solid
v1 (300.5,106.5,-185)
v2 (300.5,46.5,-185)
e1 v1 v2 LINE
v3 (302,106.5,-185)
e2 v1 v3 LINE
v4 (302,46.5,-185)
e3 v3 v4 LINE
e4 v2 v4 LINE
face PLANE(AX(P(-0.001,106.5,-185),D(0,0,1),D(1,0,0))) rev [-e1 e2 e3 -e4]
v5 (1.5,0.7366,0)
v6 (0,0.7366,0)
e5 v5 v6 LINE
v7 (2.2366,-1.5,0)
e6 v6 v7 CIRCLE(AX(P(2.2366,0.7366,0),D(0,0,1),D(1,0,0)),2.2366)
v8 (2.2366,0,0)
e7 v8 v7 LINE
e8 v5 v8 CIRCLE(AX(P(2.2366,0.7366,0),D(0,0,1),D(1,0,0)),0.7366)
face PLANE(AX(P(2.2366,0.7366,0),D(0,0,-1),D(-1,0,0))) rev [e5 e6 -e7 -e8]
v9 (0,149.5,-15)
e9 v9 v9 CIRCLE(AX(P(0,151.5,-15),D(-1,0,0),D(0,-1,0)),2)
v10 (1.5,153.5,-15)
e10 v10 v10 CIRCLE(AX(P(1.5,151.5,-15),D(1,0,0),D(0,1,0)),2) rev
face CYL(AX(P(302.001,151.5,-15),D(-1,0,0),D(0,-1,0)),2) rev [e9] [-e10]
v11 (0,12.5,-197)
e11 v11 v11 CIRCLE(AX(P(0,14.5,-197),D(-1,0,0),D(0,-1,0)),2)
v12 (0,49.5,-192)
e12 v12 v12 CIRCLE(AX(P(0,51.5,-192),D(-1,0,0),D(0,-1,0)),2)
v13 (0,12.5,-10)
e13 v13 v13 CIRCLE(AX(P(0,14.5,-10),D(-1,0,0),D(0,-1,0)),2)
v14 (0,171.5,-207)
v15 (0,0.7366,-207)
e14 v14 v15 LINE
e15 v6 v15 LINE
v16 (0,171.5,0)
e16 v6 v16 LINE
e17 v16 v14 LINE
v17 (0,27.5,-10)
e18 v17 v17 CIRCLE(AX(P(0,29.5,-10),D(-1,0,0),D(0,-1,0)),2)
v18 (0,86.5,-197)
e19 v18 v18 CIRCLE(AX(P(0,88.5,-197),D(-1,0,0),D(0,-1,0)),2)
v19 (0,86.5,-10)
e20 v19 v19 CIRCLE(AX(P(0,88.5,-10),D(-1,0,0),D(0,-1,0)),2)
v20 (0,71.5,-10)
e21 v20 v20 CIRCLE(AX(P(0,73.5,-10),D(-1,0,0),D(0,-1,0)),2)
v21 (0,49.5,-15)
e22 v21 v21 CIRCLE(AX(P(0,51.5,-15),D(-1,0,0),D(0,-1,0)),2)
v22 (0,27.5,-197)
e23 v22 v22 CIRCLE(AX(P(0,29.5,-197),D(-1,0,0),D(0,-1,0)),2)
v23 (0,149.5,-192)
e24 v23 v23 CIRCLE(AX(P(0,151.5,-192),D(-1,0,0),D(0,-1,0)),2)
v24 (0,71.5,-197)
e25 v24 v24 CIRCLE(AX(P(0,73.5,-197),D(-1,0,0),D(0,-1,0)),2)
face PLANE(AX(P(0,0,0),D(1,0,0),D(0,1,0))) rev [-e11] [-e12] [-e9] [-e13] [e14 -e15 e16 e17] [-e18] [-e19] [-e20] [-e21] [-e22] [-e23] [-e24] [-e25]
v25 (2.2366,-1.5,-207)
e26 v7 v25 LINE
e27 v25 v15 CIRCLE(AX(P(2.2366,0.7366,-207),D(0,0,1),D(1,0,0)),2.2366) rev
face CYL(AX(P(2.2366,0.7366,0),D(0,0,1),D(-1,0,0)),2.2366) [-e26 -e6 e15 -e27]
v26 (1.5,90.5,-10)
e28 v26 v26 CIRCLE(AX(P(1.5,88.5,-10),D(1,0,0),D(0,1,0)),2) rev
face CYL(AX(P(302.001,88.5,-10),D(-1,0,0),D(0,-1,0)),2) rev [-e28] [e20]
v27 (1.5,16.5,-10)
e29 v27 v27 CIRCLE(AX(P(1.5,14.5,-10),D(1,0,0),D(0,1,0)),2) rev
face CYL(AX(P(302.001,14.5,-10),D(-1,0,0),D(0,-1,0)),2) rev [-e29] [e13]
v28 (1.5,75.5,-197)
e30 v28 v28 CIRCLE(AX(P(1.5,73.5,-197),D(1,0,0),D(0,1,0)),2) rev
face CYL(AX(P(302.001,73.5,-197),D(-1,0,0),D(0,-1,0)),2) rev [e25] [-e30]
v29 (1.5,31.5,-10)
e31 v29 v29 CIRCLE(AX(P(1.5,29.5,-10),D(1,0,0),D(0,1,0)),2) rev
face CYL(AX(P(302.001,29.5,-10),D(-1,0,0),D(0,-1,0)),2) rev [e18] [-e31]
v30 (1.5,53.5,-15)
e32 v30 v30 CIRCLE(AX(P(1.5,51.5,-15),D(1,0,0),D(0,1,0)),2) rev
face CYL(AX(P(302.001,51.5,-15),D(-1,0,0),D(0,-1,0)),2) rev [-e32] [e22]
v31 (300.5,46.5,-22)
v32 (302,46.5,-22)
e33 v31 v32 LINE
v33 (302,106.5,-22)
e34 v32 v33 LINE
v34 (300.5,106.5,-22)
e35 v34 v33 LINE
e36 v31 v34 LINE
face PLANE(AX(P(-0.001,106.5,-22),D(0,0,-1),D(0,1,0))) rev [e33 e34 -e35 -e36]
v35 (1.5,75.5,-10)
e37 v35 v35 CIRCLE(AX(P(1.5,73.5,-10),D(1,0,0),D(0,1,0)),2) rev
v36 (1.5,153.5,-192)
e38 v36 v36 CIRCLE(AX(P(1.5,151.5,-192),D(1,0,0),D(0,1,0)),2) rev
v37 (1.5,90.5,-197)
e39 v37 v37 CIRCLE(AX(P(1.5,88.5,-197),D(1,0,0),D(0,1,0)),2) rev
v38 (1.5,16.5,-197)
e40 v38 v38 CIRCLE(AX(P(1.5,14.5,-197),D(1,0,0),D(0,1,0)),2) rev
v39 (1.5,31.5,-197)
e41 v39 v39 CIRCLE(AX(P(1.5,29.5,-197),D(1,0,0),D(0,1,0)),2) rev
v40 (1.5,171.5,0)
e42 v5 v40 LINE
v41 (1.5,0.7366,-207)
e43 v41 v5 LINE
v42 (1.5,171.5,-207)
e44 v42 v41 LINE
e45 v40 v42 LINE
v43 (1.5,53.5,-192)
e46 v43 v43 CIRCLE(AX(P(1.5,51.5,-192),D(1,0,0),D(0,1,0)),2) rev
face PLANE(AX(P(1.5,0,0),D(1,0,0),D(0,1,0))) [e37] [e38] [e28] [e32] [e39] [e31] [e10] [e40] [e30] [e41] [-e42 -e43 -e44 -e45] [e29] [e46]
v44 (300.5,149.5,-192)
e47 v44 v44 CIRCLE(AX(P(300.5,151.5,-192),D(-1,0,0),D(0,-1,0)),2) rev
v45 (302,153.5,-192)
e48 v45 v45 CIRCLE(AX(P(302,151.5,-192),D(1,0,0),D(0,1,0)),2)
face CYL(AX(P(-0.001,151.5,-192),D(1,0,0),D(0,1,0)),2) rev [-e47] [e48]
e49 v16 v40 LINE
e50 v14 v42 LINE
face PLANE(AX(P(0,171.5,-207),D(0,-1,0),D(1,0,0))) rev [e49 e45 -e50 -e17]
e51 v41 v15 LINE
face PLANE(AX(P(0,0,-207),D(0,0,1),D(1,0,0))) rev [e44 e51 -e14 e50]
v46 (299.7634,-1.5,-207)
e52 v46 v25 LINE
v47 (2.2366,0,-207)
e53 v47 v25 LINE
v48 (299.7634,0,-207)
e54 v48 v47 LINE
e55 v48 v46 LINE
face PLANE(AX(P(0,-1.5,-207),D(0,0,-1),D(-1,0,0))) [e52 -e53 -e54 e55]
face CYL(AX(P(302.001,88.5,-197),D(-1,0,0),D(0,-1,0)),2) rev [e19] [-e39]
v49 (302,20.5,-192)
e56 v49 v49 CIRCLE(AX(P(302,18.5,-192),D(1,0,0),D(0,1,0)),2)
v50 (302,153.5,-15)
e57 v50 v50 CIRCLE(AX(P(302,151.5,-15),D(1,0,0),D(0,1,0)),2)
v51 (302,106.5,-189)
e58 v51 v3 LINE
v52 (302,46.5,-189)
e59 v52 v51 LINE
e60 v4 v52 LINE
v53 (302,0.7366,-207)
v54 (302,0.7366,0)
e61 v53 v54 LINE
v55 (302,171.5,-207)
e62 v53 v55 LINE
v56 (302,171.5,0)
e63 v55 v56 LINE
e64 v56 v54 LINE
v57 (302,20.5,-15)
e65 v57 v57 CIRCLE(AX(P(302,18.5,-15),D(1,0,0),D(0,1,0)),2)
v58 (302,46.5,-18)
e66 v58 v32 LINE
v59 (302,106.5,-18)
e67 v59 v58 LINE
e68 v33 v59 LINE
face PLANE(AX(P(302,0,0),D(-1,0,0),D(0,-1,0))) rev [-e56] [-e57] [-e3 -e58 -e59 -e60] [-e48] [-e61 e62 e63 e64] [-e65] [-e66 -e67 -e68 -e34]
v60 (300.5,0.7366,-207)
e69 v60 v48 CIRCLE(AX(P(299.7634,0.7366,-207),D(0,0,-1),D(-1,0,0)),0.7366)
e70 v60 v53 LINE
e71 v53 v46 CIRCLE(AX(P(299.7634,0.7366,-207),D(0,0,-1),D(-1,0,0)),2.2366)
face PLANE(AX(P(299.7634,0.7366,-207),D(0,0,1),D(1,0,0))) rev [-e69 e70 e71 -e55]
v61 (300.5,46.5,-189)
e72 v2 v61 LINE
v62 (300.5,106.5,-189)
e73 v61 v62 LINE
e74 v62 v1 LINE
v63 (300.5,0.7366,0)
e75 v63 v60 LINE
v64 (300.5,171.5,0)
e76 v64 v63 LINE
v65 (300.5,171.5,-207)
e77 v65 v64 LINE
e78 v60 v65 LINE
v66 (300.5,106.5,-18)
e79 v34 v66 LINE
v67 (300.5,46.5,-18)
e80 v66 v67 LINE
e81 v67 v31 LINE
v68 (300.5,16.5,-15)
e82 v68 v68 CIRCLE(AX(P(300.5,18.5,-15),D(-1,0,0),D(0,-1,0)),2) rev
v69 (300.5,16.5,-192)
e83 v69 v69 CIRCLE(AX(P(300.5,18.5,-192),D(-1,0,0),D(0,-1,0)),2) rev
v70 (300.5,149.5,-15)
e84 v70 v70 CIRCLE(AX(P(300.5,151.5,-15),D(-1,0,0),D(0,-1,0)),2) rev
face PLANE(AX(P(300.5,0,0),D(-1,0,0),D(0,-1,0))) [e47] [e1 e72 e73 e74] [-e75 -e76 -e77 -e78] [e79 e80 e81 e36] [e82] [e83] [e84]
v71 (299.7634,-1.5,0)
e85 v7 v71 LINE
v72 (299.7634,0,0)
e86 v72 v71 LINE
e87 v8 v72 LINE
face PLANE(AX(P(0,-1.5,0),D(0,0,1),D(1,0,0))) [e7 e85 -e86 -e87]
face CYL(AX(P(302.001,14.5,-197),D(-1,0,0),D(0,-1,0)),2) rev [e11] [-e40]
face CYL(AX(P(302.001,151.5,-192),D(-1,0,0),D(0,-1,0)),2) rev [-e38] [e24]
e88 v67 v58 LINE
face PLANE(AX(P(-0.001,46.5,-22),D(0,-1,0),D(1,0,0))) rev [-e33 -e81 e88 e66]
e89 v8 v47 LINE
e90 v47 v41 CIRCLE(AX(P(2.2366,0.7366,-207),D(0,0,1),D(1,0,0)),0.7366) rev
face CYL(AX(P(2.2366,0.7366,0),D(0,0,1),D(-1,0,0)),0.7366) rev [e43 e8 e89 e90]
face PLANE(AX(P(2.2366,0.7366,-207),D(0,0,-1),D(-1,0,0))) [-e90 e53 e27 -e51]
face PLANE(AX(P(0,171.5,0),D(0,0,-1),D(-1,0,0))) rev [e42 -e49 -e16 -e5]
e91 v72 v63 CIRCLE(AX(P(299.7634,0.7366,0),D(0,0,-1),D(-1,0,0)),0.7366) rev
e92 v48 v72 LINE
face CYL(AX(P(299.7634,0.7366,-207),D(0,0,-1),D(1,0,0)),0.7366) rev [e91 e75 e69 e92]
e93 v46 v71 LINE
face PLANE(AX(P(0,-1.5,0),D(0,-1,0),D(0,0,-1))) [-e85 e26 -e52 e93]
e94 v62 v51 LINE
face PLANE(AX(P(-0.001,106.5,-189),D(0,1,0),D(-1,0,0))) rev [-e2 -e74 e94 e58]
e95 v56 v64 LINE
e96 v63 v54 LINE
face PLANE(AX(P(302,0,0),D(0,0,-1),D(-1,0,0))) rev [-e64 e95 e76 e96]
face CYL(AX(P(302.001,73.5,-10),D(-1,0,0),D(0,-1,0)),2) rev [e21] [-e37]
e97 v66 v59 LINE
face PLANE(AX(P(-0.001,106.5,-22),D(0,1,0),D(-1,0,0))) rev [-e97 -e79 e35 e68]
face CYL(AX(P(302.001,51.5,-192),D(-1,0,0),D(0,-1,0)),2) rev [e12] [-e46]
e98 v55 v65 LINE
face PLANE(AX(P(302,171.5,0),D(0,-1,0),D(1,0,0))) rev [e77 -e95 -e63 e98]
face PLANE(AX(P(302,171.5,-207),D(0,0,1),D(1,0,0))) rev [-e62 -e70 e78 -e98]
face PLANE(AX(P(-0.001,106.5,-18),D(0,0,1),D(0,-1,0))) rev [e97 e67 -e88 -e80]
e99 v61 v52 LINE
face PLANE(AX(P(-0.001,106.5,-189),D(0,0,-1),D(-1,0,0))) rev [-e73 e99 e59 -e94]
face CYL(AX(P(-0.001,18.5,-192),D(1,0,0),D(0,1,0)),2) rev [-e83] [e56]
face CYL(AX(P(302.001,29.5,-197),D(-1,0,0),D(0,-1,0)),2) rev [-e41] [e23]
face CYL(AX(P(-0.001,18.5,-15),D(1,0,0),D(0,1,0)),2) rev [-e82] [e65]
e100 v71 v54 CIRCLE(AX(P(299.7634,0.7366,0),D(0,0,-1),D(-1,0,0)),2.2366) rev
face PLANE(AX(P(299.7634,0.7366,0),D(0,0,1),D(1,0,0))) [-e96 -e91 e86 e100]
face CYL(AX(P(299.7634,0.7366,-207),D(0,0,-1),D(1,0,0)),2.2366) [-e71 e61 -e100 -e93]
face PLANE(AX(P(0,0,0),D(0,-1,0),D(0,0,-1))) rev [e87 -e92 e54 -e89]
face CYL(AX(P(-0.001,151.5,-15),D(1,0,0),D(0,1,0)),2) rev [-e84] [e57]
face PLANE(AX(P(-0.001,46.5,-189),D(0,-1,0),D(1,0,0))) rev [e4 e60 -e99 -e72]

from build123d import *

# Parameters (mm, degrees)
SKETCH_1_W                         = 302
SKETCH_1_H                         = 207
SM_BASE_FLANGE_1_DEPTH             = 1.5
SM_EDGE_FLANGE_1_STRIP_W           = 7.4732
SM_EDGE_FLANGE_1_STRIP_H           = 1.5
SM_EDGE_FLANGE_1_STRIP_CUT_DEPTH   = 207
SM_EDGE_FLANGE_1_STRIP_2_W         = 7.4732
SM_EDGE_FLANGE_1_STRIP_2_H         = 1.5
SM_EDGE_FLANGE_1_STRIP_CUT_2_DEPTH = 207
SM_EDGE_FLANGE_1_DEPTH             = 207
SM_EDGE_FLANGE_1_BEND_DEPTH        = 207
CUT_EXTRUDE_1_REACH                = 406.308
SKETCH_12_W                        = 4
SKETCH_12_H                        = 60
CUT_EXTRUDE_2_REACH                = 406.308
SKETCH_13_R                        = 2
CUT_EXTRUDE_3_REACH                = 406.308
SKETCH_14_R                        = 2
CUT_EXTRUDE_4_REACH                = 406.308
SKETCH_15_R                        = 2


# Sheet-metal steps are written as plain solids
with BuildPart() as part:
    # Sketch 1 → Базовая кромка1 (new body)
    with BuildSketch(Plane(origin=(0, 0, 0), x_dir=(1, 0, 0), z_dir=(0, 1, 0))):
        with Locations((151, 103.5)):
            Rectangle(SKETCH_1_W, SKETCH_1_H)
    extrude(amount=-SM_BASE_FLANGE_1_DEPTH)

    # Ребро-кромка1 strip (across the edge) → Ребро-кромка1 strip cut (cut)
    with BuildSketch(Plane.XY.offset(-207)):
        with Locations((-1.5, -0.75)):
            Rectangle(SM_EDGE_FLANGE_1_STRIP_W, SM_EDGE_FLANGE_1_STRIP_H)
    extrude(amount=SM_EDGE_FLANGE_1_STRIP_CUT_DEPTH, mode=Mode.SUBTRACT)

    # Ребро-кромка1 strip 2 (across the edge) → Ребро-кромка1 strip cut 2 (cut)
    with BuildSketch(Plane(origin=(302, 0, 0), x_dir=(-1, 0, 0), z_dir=(0, 0, -1))):
        with Locations((-1.5, -0.75)):
            Rectangle(SM_EDGE_FLANGE_1_STRIP_2_W, SM_EDGE_FLANGE_1_STRIP_2_H)
    extrude(amount=SM_EDGE_FLANGE_1_STRIP_CUT_2_DEPTH, mode=Mode.SUBTRACT)

    # Ребро-кромка1 section (across the edge) → Ребро-кромка1 (add)
    with BuildSketch(Plane.XY.offset(-207)):
        with BuildLine():
            Line((0, 0.7366), (0, 171.5))
            Line((0, 171.5), (1.5, 171.5))
            Line((1.5, 171.5), (1.5, 0.7366))
            ThreePointArc((1.5, 0.7366), (1.715745145, 0.215745145), (2.2366, 0))
            Line((2.2366, 0), (2.2366, -1.5))
            ThreePointArc((2.2366, -1.5), (0.655084973, -0.844915027), (0, 0.7366))
        make_face()
    extrude(amount=SM_EDGE_FLANGE_1_DEPTH)

    # Ребро-кромка1 section 2 (across the edge) → Ребро-кромка1 bend (add)
    with BuildSketch(Plane(origin=(302, 0, 0), x_dir=(-1, 0, 0), z_dir=(0, 0, -1))):
        with BuildLine():
            Line((0, 0.7366), (0, 171.5))
            Line((0, 171.5), (1.5, 171.5))
            Line((1.5, 171.5), (1.5, 0.7366))
            ThreePointArc((1.5, 0.7366), (1.715745145, 0.215745145), (2.2366, 0))
            Line((2.2366, 0), (2.2366, -1.5))
            ThreePointArc((2.2366, -1.5), (0.655084973, -0.844915027), (0, 0.7366))
        make_face()
    extrude(amount=SM_EDGE_FLANGE_1_BEND_DEPTH)

    # Эскиз12 → Вырез-Вытянуть1 (cut, up to next)
    with BuildSketch(Plane(origin=(302, 0, 0), x_dir=(0, 0, -1), z_dir=(1, 0, 0)), mode=Mode.PRIVATE) as cut_extrude_1_sk1:
        with Locations((187, 76.5)):
            Rectangle(SKETCH_12_W, SKETCH_12_H)
    cut_extrude_1_tool1 = extrude(cut_extrude_1_sk1.sketch, amount=-CUT_EXTRUDE_1_REACH, mode=Mode.PRIVATE) & part.part
    # Эскиз12 → Вырез-Вытянуть1 (cut, up to next)
    with BuildSketch(Plane(origin=(302, 0, 0), x_dir=(0, 0, -1), z_dir=(1, 0, 0)), mode=Mode.PRIVATE) as cut_extrude_1_sk2:
        with Locations((20, 76.5)):
            Rectangle(SKETCH_12_W, SKETCH_12_H)
    cut_extrude_1_tool2 = extrude(cut_extrude_1_sk2.sketch, amount=-CUT_EXTRUDE_1_REACH, mode=Mode.PRIVATE) & part.part
    add(cut_extrude_1_tool1.solids().sort_by_distance((302, 76.5, -187))[0], mode=Mode.SUBTRACT)
    add(cut_extrude_1_tool2.solids().sort_by_distance((302, 76.5, -20))[0], mode=Mode.SUBTRACT)

    # Эскиз13 → Вырез-Вытянуть2 (cut, up to next)
    with BuildSketch(Plane.ZY, mode=Mode.PRIVATE) as cut_extrude_2_sk1:
        with Locations(Location((-197, 88.5, 0), (0, 0, 270))):
            Circle(SKETCH_13_R)
    cut_extrude_2_tool1 = extrude(cut_extrude_2_sk1.sketch, amount=-CUT_EXTRUDE_2_REACH, mode=Mode.PRIVATE) & part.part
    # Эскиз13 → Вырез-Вытянуть2 (cut, up to next)
    with BuildSketch(Plane.ZY, mode=Mode.PRIVATE) as cut_extrude_2_sk2:
        with Locations(Location((-197, 73.5, 0), (0, 0, 270))):
            Circle(SKETCH_13_R)
    cut_extrude_2_tool2 = extrude(cut_extrude_2_sk2.sketch, amount=-CUT_EXTRUDE_2_REACH, mode=Mode.PRIVATE) & part.part
    # Эскиз13 → Вырез-Вытянуть2 (cut, up to next)
    with BuildSketch(Plane.ZY, mode=Mode.PRIVATE) as cut_extrude_2_sk3:
        with Locations(Location((-197, 29.5, 0), (0, 0, 270))):
            Circle(SKETCH_13_R)
    cut_extrude_2_tool3 = extrude(cut_extrude_2_sk3.sketch, amount=-CUT_EXTRUDE_2_REACH, mode=Mode.PRIVATE) & part.part
    # Эскиз13 → Вырез-Вытянуть2 (cut, up to next)
    with BuildSketch(Plane.ZY, mode=Mode.PRIVATE) as cut_extrude_2_sk4:
        with Locations(Location((-197, 14.5, 0), (0, 0, 270))):
            Circle(SKETCH_13_R)
    cut_extrude_2_tool4 = extrude(cut_extrude_2_sk4.sketch, amount=-CUT_EXTRUDE_2_REACH, mode=Mode.PRIVATE) & part.part
    # Эскиз13 → Вырез-Вытянуть2 (cut, up to next)
    with BuildSketch(Plane.ZY, mode=Mode.PRIVATE) as cut_extrude_2_sk5:
        with Locations(Location((-10, 14.5, 0), (0, 0, 270))):
            Circle(SKETCH_13_R)
    cut_extrude_2_tool5 = extrude(cut_extrude_2_sk5.sketch, amount=-CUT_EXTRUDE_2_REACH, mode=Mode.PRIVATE) & part.part
    # Эскиз13 → Вырез-Вытянуть2 (cut, up to next)
    with BuildSketch(Plane.ZY, mode=Mode.PRIVATE) as cut_extrude_2_sk6:
        with Locations(Location((-10, 29.5, 0), (0, 0, 270))):
            Circle(SKETCH_13_R)
    cut_extrude_2_tool6 = extrude(cut_extrude_2_sk6.sketch, amount=-CUT_EXTRUDE_2_REACH, mode=Mode.PRIVATE) & part.part
    # Эскиз13 → Вырез-Вытянуть2 (cut, up to next)
    with BuildSketch(Plane.ZY, mode=Mode.PRIVATE) as cut_extrude_2_sk7:
        with Locations(Location((-10, 73.5, 0), (0, 0, 270))):
            Circle(SKETCH_13_R)
    cut_extrude_2_tool7 = extrude(cut_extrude_2_sk7.sketch, amount=-CUT_EXTRUDE_2_REACH, mode=Mode.PRIVATE) & part.part
    # Эскиз13 → Вырез-Вытянуть2 (cut, up to next)
    with BuildSketch(Plane.ZY, mode=Mode.PRIVATE) as cut_extrude_2_sk8:
        with Locations(Location((-10, 88.5, 0), (0, 0, 270))):
            Circle(SKETCH_13_R)
    cut_extrude_2_tool8 = extrude(cut_extrude_2_sk8.sketch, amount=-CUT_EXTRUDE_2_REACH, mode=Mode.PRIVATE) & part.part
    add(cut_extrude_2_tool1.solids().sort_by_distance((0, 88.5, -197))[0], mode=Mode.SUBTRACT)
    add(cut_extrude_2_tool2.solids().sort_by_distance((0, 73.5, -197))[0], mode=Mode.SUBTRACT)
    add(cut_extrude_2_tool3.solids().sort_by_distance((0, 29.5, -197))[0], mode=Mode.SUBTRACT)
    add(cut_extrude_2_tool4.solids().sort_by_distance((0, 14.5, -197))[0], mode=Mode.SUBTRACT)
    add(cut_extrude_2_tool5.solids().sort_by_distance((0, 14.5, -10))[0], mode=Mode.SUBTRACT)
    add(cut_extrude_2_tool6.solids().sort_by_distance((0, 29.5, -10))[0], mode=Mode.SUBTRACT)
    add(cut_extrude_2_tool7.solids().sort_by_distance((0, 73.5, -10))[0], mode=Mode.SUBTRACT)
    add(cut_extrude_2_tool8.solids().sort_by_distance((0, 88.5, -10))[0], mode=Mode.SUBTRACT)

    # Эскиз14 → Вырез-Вытянуть3 (cut, up to next)
    with BuildSketch(Plane.ZY, mode=Mode.PRIVATE) as cut_extrude_3_sk1:
        with Locations(Location((-192, 151.5, 0), (0, 0, 270))):
            Circle(SKETCH_14_R)
    cut_extrude_3_tool1 = extrude(cut_extrude_3_sk1.sketch, amount=-CUT_EXTRUDE_3_REACH, mode=Mode.PRIVATE) & part.part
    # Эскиз14 → Вырез-Вытянуть3 (cut, up to next)
    with BuildSketch(Plane.ZY, mode=Mode.PRIVATE) as cut_extrude_3_sk2:
        with Locations(Location((-15, 151.5, 0), (0, 0, 270))):
            Circle(SKETCH_14_R)
    cut_extrude_3_tool2 = extrude(cut_extrude_3_sk2.sketch, amount=-CUT_EXTRUDE_3_REACH, mode=Mode.PRIVATE) & part.part
    # Эскиз14 → Вырез-Вытянуть3 (cut, up to next)
    with BuildSketch(Plane.ZY, mode=Mode.PRIVATE) as cut_extrude_3_sk3:
        with Locations(Location((-15, 51.5, 0), (0, 0, 270))):
            Circle(SKETCH_14_R)
    cut_extrude_3_tool3 = extrude(cut_extrude_3_sk3.sketch, amount=-CUT_EXTRUDE_3_REACH, mode=Mode.PRIVATE) & part.part
    # Эскиз14 → Вырез-Вытянуть3 (cut, up to next)
    with BuildSketch(Plane.ZY, mode=Mode.PRIVATE) as cut_extrude_3_sk4:
        with Locations(Location((-192, 51.5, 0), (0, 0, 270))):
            Circle(SKETCH_14_R)
    cut_extrude_3_tool4 = extrude(cut_extrude_3_sk4.sketch, amount=-CUT_EXTRUDE_3_REACH, mode=Mode.PRIVATE) & part.part
    add(cut_extrude_3_tool1.solids().sort_by_distance((0, 151.5, -192))[0], mode=Mode.SUBTRACT)
    add(cut_extrude_3_tool2.solids().sort_by_distance((0, 151.5, -15))[0], mode=Mode.SUBTRACT)
    add(cut_extrude_3_tool3.solids().sort_by_distance((0, 51.5, -15))[0], mode=Mode.SUBTRACT)
    add(cut_extrude_3_tool4.solids().sort_by_distance((0, 51.5, -192))[0], mode=Mode.SUBTRACT)

    # Эскиз15 → Вырез-Вытянуть4 (cut, up to next)
    with BuildSketch(Plane(origin=(302, 0, 0), x_dir=(0, 0, -1), z_dir=(1, 0, 0)), mode=Mode.PRIVATE) as cut_extrude_4_sk1:
        with Locations(Location((15, 151.5, 0), (0, 0, 270))):
            Circle(SKETCH_15_R)
    cut_extrude_4_tool1 = extrude(cut_extrude_4_sk1.sketch, amount=-CUT_EXTRUDE_4_REACH, mode=Mode.PRIVATE) & part.part
    # Эскиз15 → Вырез-Вытянуть4 (cut, up to next)
    with BuildSketch(Plane(origin=(302, 0, 0), x_dir=(0, 0, -1), z_dir=(1, 0, 0)), mode=Mode.PRIVATE) as cut_extrude_4_sk2:
        with Locations(Location((192, 151.5, 0), (0, 0, 270))):
            Circle(SKETCH_15_R)
    cut_extrude_4_tool2 = extrude(cut_extrude_4_sk2.sketch, amount=-CUT_EXTRUDE_4_REACH, mode=Mode.PRIVATE) & part.part
    # Эскиз15 → Вырез-Вытянуть4 (cut, up to next)
    with BuildSketch(Plane(origin=(302, 0, 0), x_dir=(0, 0, -1), z_dir=(1, 0, 0)), mode=Mode.PRIVATE) as cut_extrude_4_sk3:
        with Locations(Location((15, 18.5, 0), (0, 0, 90))):
            Circle(SKETCH_15_R)
    cut_extrude_4_tool3 = extrude(cut_extrude_4_sk3.sketch, amount=-CUT_EXTRUDE_4_REACH, mode=Mode.PRIVATE) & part.part
    # Эскиз15 → Вырез-Вытянуть4 (cut, up to next)
    with BuildSketch(Plane(origin=(302, 0, 0), x_dir=(0, 0, -1), z_dir=(1, 0, 0)), mode=Mode.PRIVATE) as cut_extrude_4_sk4:
        with Locations(Location((192, 18.5, 0), (0, 0, 90))):
            Circle(SKETCH_15_R)
    cut_extrude_4_tool4 = extrude(cut_extrude_4_sk4.sketch, amount=-CUT_EXTRUDE_4_REACH, mode=Mode.PRIVATE) & part.part
    add(cut_extrude_4_tool1.solids().sort_by_distance((302, 151.5, -15))[0], mode=Mode.SUBTRACT)
    add(cut_extrude_4_tool2.solids().sort_by_distance((302, 151.5, -192))[0], mode=Mode.SUBTRACT)
    add(cut_extrude_4_tool3.solids().sort_by_distance((302, 18.5, -15))[0], mode=Mode.SUBTRACT)
    add(cut_extrude_4_tool4.solids().sort_by_distance((302, 18.5, -192))[0], mode=Mode.SUBTRACT)


solid = part.part
